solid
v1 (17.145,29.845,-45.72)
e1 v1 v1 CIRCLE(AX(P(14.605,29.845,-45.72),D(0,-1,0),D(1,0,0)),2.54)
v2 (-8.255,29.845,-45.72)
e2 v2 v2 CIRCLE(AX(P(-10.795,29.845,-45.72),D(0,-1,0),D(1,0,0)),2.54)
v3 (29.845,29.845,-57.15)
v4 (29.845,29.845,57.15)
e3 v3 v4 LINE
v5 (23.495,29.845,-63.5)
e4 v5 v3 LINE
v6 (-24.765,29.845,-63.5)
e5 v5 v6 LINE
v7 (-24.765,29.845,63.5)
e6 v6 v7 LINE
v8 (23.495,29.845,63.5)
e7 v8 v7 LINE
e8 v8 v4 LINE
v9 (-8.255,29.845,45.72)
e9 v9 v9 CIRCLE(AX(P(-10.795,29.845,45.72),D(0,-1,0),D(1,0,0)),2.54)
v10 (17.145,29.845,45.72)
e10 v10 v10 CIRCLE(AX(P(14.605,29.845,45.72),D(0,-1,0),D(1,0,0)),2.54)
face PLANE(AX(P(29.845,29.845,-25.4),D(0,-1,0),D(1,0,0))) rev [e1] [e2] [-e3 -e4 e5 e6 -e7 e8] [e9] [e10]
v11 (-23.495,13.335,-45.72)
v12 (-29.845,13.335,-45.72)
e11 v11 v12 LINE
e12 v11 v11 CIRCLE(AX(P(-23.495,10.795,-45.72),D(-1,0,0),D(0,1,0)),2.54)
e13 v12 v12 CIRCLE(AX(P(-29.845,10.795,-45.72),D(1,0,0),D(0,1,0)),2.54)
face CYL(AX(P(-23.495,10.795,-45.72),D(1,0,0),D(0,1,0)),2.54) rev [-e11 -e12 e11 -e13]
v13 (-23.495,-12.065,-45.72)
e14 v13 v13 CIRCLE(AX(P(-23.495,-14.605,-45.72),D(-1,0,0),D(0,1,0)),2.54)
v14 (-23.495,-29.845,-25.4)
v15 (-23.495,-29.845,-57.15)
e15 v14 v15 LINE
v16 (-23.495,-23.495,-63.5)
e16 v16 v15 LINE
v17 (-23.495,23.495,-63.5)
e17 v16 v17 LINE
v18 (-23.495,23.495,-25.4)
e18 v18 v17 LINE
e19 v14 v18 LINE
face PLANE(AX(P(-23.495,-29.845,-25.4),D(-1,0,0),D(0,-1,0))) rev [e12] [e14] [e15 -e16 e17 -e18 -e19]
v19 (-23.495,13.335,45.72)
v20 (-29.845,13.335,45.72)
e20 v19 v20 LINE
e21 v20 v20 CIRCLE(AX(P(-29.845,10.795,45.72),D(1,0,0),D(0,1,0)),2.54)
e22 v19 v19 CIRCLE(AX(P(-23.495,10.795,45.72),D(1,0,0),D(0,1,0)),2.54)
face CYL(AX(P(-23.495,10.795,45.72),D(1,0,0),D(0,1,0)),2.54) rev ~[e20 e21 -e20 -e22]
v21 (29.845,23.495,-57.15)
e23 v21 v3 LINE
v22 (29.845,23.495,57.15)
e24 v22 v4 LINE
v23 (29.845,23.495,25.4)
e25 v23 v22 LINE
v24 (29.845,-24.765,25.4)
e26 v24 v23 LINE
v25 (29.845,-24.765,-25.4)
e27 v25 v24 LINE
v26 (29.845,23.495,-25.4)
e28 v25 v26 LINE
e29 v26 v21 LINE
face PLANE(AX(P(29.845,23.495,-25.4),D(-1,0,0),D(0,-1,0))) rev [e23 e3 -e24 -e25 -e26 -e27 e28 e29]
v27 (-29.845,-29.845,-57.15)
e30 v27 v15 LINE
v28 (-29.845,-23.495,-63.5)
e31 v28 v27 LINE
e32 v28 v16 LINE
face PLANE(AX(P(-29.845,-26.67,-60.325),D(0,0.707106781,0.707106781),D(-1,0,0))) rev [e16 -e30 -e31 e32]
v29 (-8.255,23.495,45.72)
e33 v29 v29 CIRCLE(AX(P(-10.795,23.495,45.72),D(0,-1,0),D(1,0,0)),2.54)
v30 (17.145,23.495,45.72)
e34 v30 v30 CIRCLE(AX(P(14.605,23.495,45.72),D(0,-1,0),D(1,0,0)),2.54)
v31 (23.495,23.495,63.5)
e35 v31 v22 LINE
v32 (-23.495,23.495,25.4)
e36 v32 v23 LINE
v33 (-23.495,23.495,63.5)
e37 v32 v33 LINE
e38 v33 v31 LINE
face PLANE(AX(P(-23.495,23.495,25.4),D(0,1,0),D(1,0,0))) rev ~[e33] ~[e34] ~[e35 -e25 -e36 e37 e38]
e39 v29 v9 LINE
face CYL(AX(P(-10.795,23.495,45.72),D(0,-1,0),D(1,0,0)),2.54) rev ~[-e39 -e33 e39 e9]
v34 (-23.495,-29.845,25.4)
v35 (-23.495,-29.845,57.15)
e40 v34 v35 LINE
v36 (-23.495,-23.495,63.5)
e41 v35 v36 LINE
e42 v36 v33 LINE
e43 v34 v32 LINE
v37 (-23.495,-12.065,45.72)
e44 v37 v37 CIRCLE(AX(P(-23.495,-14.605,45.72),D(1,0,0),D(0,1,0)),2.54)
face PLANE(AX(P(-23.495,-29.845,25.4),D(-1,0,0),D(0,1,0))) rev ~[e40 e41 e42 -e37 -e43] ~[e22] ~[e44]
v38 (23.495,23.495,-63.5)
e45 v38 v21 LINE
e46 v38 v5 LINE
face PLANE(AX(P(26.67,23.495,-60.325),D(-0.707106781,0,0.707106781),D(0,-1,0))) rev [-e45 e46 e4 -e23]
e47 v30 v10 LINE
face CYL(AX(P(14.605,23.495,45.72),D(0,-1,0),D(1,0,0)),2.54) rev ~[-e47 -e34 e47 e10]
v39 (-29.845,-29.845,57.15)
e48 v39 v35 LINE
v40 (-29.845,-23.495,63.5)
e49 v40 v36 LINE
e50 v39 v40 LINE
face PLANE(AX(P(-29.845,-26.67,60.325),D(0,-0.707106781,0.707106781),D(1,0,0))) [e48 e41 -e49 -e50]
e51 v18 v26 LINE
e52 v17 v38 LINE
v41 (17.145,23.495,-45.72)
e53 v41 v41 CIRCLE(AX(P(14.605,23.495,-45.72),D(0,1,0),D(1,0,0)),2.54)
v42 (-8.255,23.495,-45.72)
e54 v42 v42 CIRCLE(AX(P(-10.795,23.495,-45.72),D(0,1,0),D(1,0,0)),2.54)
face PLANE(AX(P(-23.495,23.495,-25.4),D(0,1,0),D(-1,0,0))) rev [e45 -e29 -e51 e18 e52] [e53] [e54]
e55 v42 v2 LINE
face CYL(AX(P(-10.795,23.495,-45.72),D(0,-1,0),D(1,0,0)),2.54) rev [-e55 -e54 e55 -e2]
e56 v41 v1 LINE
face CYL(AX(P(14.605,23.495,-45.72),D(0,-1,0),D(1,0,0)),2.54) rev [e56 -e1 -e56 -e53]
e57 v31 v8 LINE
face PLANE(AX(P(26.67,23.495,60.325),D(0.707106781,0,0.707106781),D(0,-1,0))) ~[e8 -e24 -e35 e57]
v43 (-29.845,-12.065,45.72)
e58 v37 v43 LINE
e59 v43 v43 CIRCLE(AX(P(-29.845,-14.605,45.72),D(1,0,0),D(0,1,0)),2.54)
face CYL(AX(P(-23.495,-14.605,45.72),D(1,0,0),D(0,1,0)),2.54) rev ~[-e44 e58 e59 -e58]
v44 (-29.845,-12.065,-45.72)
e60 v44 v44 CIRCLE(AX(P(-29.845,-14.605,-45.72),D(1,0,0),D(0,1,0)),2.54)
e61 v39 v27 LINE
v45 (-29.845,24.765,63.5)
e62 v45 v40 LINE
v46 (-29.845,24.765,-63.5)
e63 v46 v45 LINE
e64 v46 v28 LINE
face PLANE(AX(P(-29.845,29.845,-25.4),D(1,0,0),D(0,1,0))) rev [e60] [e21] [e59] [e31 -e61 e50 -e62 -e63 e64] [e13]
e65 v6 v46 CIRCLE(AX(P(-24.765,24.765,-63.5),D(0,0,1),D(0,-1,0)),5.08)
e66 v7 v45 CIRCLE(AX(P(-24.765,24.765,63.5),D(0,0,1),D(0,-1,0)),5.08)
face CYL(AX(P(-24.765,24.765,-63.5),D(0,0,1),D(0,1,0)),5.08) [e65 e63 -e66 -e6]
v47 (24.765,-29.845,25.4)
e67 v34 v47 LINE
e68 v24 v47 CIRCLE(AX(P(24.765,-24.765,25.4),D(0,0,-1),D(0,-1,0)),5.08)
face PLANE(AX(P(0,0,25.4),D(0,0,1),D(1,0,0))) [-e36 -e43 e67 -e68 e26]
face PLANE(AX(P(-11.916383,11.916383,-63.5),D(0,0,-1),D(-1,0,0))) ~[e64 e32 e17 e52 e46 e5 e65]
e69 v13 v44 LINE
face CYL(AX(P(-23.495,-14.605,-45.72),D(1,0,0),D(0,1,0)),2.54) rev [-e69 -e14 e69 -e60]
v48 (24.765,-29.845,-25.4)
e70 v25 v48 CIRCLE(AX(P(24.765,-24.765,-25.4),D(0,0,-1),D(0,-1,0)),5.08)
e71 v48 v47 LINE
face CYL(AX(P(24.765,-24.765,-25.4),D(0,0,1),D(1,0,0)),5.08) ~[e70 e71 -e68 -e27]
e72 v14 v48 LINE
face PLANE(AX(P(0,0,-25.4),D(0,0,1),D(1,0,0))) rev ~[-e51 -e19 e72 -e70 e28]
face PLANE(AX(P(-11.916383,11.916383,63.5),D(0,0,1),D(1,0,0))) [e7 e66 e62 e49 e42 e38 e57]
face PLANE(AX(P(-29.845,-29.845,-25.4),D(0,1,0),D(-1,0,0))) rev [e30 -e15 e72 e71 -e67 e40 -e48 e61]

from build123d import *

# Parameters (mm, degrees)
F0_W          = 59.69
F0_H          = 59.69
F1_DEPTH      = 25.4
F1_DEPTH_BACK = 25.4
F3_DEPTH      = 38.1
F4_SIZE       = 6.35
F5_R          = 5.08
F6_R          = 5.08
F7_R          = 2.54
F8_DEPTH      = 25.4
F9_R          = 2.54
F10_DEPTH     = 25.4


# Not quite as in the source:
# - a pattern or mirror of a feature is missing from the dataset's text; its kind, count and spacing are read off the source's solid


with BuildPart() as f1:
    # F0 (on Top) → F1 (new body, two sides)
    with BuildSketch(Plane.XY) as f1_sk:
        Rectangle(F0_W, F0_H)
    extrude(amount=F1_DEPTH)
    extrude(f1_sk.sketch, amount=-F1_DEPTH_BACK)

    # F2 (on face) → F3 (join)
    with BuildSketch(Plane.XY.offset(25.4)):
        Polygon((-23.495, 23.495), (29.845, 23.495), (29.845, 29.845), (-29.845, 29.845), (-29.845, -29.845), (-23.495, -29.845), align=None)
    f3 = extrude(amount=F3_DEPTH)

    # F3_copies: F3 across plane
    add(f3.mirror(Plane(origin=(0, 0, 0), x_dir=(-1, 0, 0), z_dir=(0, 0, -1))))

    # F4
    f4_edges = [f1.edges().sort_by_distance(p)[0] for p in [
        (-26.67, -29.845, 63.5),
        (29.845, 26.67, 63.5),
        (-26.67, -29.845, -63.5),
        (29.845, 26.67, -63.5),
    ]]
    chamfer(f4_edges, length=F4_SIZE)

    # F5
    f5_edges = [f1.edges().sort_by_distance(p)[0] for p in [
        (29.845, -29.845, 0),
    ]]
    fillet(f5_edges, radius=F5_R)

    # F6
    f6_edges = [f1.edges().sort_by_distance(p)[0] for p in [
        (-29.845, 29.845, 0),
    ]]
    fillet(f6_edges, radius=F6_R)

    # F7 (on face) → F8 (cut)
    with BuildSketch(Plane.XZ.offset(-23.495)):
        with Locations((-10.795, 45.72)):
            Circle(F7_R)
        with Locations((14.605, 45.72)):
            Circle(F7_R)
    f8 = extrude(amount=-F8_DEPTH, mode=Mode.SUBTRACT)

    # F8_copies: F8 across plane
    add(f8.mirror(Plane(origin=(0, 0, 0), x_dir=(-1, 0, 0), z_dir=(0, 0, -1))), mode=Mode.SUBTRACT)

    # F9 (on face) → F10 (cut)
    with BuildSketch(Plane.YZ.offset(-23.495)):
        with Locations((-14.605, 45.72)):
            Circle(F9_R)
        with Locations((10.795, 45.72)):
            Circle(F9_R)
    f10 = extrude(amount=-F10_DEPTH, mode=Mode.SUBTRACT)

    # F10_copies: F10 across plane
    add(f10.mirror(Plane(origin=(0, 0, 0), x_dir=(-1, 0, 0), z_dir=(0, 0, -1))), mode=Mode.SUBTRACT)


solid = f1.part
